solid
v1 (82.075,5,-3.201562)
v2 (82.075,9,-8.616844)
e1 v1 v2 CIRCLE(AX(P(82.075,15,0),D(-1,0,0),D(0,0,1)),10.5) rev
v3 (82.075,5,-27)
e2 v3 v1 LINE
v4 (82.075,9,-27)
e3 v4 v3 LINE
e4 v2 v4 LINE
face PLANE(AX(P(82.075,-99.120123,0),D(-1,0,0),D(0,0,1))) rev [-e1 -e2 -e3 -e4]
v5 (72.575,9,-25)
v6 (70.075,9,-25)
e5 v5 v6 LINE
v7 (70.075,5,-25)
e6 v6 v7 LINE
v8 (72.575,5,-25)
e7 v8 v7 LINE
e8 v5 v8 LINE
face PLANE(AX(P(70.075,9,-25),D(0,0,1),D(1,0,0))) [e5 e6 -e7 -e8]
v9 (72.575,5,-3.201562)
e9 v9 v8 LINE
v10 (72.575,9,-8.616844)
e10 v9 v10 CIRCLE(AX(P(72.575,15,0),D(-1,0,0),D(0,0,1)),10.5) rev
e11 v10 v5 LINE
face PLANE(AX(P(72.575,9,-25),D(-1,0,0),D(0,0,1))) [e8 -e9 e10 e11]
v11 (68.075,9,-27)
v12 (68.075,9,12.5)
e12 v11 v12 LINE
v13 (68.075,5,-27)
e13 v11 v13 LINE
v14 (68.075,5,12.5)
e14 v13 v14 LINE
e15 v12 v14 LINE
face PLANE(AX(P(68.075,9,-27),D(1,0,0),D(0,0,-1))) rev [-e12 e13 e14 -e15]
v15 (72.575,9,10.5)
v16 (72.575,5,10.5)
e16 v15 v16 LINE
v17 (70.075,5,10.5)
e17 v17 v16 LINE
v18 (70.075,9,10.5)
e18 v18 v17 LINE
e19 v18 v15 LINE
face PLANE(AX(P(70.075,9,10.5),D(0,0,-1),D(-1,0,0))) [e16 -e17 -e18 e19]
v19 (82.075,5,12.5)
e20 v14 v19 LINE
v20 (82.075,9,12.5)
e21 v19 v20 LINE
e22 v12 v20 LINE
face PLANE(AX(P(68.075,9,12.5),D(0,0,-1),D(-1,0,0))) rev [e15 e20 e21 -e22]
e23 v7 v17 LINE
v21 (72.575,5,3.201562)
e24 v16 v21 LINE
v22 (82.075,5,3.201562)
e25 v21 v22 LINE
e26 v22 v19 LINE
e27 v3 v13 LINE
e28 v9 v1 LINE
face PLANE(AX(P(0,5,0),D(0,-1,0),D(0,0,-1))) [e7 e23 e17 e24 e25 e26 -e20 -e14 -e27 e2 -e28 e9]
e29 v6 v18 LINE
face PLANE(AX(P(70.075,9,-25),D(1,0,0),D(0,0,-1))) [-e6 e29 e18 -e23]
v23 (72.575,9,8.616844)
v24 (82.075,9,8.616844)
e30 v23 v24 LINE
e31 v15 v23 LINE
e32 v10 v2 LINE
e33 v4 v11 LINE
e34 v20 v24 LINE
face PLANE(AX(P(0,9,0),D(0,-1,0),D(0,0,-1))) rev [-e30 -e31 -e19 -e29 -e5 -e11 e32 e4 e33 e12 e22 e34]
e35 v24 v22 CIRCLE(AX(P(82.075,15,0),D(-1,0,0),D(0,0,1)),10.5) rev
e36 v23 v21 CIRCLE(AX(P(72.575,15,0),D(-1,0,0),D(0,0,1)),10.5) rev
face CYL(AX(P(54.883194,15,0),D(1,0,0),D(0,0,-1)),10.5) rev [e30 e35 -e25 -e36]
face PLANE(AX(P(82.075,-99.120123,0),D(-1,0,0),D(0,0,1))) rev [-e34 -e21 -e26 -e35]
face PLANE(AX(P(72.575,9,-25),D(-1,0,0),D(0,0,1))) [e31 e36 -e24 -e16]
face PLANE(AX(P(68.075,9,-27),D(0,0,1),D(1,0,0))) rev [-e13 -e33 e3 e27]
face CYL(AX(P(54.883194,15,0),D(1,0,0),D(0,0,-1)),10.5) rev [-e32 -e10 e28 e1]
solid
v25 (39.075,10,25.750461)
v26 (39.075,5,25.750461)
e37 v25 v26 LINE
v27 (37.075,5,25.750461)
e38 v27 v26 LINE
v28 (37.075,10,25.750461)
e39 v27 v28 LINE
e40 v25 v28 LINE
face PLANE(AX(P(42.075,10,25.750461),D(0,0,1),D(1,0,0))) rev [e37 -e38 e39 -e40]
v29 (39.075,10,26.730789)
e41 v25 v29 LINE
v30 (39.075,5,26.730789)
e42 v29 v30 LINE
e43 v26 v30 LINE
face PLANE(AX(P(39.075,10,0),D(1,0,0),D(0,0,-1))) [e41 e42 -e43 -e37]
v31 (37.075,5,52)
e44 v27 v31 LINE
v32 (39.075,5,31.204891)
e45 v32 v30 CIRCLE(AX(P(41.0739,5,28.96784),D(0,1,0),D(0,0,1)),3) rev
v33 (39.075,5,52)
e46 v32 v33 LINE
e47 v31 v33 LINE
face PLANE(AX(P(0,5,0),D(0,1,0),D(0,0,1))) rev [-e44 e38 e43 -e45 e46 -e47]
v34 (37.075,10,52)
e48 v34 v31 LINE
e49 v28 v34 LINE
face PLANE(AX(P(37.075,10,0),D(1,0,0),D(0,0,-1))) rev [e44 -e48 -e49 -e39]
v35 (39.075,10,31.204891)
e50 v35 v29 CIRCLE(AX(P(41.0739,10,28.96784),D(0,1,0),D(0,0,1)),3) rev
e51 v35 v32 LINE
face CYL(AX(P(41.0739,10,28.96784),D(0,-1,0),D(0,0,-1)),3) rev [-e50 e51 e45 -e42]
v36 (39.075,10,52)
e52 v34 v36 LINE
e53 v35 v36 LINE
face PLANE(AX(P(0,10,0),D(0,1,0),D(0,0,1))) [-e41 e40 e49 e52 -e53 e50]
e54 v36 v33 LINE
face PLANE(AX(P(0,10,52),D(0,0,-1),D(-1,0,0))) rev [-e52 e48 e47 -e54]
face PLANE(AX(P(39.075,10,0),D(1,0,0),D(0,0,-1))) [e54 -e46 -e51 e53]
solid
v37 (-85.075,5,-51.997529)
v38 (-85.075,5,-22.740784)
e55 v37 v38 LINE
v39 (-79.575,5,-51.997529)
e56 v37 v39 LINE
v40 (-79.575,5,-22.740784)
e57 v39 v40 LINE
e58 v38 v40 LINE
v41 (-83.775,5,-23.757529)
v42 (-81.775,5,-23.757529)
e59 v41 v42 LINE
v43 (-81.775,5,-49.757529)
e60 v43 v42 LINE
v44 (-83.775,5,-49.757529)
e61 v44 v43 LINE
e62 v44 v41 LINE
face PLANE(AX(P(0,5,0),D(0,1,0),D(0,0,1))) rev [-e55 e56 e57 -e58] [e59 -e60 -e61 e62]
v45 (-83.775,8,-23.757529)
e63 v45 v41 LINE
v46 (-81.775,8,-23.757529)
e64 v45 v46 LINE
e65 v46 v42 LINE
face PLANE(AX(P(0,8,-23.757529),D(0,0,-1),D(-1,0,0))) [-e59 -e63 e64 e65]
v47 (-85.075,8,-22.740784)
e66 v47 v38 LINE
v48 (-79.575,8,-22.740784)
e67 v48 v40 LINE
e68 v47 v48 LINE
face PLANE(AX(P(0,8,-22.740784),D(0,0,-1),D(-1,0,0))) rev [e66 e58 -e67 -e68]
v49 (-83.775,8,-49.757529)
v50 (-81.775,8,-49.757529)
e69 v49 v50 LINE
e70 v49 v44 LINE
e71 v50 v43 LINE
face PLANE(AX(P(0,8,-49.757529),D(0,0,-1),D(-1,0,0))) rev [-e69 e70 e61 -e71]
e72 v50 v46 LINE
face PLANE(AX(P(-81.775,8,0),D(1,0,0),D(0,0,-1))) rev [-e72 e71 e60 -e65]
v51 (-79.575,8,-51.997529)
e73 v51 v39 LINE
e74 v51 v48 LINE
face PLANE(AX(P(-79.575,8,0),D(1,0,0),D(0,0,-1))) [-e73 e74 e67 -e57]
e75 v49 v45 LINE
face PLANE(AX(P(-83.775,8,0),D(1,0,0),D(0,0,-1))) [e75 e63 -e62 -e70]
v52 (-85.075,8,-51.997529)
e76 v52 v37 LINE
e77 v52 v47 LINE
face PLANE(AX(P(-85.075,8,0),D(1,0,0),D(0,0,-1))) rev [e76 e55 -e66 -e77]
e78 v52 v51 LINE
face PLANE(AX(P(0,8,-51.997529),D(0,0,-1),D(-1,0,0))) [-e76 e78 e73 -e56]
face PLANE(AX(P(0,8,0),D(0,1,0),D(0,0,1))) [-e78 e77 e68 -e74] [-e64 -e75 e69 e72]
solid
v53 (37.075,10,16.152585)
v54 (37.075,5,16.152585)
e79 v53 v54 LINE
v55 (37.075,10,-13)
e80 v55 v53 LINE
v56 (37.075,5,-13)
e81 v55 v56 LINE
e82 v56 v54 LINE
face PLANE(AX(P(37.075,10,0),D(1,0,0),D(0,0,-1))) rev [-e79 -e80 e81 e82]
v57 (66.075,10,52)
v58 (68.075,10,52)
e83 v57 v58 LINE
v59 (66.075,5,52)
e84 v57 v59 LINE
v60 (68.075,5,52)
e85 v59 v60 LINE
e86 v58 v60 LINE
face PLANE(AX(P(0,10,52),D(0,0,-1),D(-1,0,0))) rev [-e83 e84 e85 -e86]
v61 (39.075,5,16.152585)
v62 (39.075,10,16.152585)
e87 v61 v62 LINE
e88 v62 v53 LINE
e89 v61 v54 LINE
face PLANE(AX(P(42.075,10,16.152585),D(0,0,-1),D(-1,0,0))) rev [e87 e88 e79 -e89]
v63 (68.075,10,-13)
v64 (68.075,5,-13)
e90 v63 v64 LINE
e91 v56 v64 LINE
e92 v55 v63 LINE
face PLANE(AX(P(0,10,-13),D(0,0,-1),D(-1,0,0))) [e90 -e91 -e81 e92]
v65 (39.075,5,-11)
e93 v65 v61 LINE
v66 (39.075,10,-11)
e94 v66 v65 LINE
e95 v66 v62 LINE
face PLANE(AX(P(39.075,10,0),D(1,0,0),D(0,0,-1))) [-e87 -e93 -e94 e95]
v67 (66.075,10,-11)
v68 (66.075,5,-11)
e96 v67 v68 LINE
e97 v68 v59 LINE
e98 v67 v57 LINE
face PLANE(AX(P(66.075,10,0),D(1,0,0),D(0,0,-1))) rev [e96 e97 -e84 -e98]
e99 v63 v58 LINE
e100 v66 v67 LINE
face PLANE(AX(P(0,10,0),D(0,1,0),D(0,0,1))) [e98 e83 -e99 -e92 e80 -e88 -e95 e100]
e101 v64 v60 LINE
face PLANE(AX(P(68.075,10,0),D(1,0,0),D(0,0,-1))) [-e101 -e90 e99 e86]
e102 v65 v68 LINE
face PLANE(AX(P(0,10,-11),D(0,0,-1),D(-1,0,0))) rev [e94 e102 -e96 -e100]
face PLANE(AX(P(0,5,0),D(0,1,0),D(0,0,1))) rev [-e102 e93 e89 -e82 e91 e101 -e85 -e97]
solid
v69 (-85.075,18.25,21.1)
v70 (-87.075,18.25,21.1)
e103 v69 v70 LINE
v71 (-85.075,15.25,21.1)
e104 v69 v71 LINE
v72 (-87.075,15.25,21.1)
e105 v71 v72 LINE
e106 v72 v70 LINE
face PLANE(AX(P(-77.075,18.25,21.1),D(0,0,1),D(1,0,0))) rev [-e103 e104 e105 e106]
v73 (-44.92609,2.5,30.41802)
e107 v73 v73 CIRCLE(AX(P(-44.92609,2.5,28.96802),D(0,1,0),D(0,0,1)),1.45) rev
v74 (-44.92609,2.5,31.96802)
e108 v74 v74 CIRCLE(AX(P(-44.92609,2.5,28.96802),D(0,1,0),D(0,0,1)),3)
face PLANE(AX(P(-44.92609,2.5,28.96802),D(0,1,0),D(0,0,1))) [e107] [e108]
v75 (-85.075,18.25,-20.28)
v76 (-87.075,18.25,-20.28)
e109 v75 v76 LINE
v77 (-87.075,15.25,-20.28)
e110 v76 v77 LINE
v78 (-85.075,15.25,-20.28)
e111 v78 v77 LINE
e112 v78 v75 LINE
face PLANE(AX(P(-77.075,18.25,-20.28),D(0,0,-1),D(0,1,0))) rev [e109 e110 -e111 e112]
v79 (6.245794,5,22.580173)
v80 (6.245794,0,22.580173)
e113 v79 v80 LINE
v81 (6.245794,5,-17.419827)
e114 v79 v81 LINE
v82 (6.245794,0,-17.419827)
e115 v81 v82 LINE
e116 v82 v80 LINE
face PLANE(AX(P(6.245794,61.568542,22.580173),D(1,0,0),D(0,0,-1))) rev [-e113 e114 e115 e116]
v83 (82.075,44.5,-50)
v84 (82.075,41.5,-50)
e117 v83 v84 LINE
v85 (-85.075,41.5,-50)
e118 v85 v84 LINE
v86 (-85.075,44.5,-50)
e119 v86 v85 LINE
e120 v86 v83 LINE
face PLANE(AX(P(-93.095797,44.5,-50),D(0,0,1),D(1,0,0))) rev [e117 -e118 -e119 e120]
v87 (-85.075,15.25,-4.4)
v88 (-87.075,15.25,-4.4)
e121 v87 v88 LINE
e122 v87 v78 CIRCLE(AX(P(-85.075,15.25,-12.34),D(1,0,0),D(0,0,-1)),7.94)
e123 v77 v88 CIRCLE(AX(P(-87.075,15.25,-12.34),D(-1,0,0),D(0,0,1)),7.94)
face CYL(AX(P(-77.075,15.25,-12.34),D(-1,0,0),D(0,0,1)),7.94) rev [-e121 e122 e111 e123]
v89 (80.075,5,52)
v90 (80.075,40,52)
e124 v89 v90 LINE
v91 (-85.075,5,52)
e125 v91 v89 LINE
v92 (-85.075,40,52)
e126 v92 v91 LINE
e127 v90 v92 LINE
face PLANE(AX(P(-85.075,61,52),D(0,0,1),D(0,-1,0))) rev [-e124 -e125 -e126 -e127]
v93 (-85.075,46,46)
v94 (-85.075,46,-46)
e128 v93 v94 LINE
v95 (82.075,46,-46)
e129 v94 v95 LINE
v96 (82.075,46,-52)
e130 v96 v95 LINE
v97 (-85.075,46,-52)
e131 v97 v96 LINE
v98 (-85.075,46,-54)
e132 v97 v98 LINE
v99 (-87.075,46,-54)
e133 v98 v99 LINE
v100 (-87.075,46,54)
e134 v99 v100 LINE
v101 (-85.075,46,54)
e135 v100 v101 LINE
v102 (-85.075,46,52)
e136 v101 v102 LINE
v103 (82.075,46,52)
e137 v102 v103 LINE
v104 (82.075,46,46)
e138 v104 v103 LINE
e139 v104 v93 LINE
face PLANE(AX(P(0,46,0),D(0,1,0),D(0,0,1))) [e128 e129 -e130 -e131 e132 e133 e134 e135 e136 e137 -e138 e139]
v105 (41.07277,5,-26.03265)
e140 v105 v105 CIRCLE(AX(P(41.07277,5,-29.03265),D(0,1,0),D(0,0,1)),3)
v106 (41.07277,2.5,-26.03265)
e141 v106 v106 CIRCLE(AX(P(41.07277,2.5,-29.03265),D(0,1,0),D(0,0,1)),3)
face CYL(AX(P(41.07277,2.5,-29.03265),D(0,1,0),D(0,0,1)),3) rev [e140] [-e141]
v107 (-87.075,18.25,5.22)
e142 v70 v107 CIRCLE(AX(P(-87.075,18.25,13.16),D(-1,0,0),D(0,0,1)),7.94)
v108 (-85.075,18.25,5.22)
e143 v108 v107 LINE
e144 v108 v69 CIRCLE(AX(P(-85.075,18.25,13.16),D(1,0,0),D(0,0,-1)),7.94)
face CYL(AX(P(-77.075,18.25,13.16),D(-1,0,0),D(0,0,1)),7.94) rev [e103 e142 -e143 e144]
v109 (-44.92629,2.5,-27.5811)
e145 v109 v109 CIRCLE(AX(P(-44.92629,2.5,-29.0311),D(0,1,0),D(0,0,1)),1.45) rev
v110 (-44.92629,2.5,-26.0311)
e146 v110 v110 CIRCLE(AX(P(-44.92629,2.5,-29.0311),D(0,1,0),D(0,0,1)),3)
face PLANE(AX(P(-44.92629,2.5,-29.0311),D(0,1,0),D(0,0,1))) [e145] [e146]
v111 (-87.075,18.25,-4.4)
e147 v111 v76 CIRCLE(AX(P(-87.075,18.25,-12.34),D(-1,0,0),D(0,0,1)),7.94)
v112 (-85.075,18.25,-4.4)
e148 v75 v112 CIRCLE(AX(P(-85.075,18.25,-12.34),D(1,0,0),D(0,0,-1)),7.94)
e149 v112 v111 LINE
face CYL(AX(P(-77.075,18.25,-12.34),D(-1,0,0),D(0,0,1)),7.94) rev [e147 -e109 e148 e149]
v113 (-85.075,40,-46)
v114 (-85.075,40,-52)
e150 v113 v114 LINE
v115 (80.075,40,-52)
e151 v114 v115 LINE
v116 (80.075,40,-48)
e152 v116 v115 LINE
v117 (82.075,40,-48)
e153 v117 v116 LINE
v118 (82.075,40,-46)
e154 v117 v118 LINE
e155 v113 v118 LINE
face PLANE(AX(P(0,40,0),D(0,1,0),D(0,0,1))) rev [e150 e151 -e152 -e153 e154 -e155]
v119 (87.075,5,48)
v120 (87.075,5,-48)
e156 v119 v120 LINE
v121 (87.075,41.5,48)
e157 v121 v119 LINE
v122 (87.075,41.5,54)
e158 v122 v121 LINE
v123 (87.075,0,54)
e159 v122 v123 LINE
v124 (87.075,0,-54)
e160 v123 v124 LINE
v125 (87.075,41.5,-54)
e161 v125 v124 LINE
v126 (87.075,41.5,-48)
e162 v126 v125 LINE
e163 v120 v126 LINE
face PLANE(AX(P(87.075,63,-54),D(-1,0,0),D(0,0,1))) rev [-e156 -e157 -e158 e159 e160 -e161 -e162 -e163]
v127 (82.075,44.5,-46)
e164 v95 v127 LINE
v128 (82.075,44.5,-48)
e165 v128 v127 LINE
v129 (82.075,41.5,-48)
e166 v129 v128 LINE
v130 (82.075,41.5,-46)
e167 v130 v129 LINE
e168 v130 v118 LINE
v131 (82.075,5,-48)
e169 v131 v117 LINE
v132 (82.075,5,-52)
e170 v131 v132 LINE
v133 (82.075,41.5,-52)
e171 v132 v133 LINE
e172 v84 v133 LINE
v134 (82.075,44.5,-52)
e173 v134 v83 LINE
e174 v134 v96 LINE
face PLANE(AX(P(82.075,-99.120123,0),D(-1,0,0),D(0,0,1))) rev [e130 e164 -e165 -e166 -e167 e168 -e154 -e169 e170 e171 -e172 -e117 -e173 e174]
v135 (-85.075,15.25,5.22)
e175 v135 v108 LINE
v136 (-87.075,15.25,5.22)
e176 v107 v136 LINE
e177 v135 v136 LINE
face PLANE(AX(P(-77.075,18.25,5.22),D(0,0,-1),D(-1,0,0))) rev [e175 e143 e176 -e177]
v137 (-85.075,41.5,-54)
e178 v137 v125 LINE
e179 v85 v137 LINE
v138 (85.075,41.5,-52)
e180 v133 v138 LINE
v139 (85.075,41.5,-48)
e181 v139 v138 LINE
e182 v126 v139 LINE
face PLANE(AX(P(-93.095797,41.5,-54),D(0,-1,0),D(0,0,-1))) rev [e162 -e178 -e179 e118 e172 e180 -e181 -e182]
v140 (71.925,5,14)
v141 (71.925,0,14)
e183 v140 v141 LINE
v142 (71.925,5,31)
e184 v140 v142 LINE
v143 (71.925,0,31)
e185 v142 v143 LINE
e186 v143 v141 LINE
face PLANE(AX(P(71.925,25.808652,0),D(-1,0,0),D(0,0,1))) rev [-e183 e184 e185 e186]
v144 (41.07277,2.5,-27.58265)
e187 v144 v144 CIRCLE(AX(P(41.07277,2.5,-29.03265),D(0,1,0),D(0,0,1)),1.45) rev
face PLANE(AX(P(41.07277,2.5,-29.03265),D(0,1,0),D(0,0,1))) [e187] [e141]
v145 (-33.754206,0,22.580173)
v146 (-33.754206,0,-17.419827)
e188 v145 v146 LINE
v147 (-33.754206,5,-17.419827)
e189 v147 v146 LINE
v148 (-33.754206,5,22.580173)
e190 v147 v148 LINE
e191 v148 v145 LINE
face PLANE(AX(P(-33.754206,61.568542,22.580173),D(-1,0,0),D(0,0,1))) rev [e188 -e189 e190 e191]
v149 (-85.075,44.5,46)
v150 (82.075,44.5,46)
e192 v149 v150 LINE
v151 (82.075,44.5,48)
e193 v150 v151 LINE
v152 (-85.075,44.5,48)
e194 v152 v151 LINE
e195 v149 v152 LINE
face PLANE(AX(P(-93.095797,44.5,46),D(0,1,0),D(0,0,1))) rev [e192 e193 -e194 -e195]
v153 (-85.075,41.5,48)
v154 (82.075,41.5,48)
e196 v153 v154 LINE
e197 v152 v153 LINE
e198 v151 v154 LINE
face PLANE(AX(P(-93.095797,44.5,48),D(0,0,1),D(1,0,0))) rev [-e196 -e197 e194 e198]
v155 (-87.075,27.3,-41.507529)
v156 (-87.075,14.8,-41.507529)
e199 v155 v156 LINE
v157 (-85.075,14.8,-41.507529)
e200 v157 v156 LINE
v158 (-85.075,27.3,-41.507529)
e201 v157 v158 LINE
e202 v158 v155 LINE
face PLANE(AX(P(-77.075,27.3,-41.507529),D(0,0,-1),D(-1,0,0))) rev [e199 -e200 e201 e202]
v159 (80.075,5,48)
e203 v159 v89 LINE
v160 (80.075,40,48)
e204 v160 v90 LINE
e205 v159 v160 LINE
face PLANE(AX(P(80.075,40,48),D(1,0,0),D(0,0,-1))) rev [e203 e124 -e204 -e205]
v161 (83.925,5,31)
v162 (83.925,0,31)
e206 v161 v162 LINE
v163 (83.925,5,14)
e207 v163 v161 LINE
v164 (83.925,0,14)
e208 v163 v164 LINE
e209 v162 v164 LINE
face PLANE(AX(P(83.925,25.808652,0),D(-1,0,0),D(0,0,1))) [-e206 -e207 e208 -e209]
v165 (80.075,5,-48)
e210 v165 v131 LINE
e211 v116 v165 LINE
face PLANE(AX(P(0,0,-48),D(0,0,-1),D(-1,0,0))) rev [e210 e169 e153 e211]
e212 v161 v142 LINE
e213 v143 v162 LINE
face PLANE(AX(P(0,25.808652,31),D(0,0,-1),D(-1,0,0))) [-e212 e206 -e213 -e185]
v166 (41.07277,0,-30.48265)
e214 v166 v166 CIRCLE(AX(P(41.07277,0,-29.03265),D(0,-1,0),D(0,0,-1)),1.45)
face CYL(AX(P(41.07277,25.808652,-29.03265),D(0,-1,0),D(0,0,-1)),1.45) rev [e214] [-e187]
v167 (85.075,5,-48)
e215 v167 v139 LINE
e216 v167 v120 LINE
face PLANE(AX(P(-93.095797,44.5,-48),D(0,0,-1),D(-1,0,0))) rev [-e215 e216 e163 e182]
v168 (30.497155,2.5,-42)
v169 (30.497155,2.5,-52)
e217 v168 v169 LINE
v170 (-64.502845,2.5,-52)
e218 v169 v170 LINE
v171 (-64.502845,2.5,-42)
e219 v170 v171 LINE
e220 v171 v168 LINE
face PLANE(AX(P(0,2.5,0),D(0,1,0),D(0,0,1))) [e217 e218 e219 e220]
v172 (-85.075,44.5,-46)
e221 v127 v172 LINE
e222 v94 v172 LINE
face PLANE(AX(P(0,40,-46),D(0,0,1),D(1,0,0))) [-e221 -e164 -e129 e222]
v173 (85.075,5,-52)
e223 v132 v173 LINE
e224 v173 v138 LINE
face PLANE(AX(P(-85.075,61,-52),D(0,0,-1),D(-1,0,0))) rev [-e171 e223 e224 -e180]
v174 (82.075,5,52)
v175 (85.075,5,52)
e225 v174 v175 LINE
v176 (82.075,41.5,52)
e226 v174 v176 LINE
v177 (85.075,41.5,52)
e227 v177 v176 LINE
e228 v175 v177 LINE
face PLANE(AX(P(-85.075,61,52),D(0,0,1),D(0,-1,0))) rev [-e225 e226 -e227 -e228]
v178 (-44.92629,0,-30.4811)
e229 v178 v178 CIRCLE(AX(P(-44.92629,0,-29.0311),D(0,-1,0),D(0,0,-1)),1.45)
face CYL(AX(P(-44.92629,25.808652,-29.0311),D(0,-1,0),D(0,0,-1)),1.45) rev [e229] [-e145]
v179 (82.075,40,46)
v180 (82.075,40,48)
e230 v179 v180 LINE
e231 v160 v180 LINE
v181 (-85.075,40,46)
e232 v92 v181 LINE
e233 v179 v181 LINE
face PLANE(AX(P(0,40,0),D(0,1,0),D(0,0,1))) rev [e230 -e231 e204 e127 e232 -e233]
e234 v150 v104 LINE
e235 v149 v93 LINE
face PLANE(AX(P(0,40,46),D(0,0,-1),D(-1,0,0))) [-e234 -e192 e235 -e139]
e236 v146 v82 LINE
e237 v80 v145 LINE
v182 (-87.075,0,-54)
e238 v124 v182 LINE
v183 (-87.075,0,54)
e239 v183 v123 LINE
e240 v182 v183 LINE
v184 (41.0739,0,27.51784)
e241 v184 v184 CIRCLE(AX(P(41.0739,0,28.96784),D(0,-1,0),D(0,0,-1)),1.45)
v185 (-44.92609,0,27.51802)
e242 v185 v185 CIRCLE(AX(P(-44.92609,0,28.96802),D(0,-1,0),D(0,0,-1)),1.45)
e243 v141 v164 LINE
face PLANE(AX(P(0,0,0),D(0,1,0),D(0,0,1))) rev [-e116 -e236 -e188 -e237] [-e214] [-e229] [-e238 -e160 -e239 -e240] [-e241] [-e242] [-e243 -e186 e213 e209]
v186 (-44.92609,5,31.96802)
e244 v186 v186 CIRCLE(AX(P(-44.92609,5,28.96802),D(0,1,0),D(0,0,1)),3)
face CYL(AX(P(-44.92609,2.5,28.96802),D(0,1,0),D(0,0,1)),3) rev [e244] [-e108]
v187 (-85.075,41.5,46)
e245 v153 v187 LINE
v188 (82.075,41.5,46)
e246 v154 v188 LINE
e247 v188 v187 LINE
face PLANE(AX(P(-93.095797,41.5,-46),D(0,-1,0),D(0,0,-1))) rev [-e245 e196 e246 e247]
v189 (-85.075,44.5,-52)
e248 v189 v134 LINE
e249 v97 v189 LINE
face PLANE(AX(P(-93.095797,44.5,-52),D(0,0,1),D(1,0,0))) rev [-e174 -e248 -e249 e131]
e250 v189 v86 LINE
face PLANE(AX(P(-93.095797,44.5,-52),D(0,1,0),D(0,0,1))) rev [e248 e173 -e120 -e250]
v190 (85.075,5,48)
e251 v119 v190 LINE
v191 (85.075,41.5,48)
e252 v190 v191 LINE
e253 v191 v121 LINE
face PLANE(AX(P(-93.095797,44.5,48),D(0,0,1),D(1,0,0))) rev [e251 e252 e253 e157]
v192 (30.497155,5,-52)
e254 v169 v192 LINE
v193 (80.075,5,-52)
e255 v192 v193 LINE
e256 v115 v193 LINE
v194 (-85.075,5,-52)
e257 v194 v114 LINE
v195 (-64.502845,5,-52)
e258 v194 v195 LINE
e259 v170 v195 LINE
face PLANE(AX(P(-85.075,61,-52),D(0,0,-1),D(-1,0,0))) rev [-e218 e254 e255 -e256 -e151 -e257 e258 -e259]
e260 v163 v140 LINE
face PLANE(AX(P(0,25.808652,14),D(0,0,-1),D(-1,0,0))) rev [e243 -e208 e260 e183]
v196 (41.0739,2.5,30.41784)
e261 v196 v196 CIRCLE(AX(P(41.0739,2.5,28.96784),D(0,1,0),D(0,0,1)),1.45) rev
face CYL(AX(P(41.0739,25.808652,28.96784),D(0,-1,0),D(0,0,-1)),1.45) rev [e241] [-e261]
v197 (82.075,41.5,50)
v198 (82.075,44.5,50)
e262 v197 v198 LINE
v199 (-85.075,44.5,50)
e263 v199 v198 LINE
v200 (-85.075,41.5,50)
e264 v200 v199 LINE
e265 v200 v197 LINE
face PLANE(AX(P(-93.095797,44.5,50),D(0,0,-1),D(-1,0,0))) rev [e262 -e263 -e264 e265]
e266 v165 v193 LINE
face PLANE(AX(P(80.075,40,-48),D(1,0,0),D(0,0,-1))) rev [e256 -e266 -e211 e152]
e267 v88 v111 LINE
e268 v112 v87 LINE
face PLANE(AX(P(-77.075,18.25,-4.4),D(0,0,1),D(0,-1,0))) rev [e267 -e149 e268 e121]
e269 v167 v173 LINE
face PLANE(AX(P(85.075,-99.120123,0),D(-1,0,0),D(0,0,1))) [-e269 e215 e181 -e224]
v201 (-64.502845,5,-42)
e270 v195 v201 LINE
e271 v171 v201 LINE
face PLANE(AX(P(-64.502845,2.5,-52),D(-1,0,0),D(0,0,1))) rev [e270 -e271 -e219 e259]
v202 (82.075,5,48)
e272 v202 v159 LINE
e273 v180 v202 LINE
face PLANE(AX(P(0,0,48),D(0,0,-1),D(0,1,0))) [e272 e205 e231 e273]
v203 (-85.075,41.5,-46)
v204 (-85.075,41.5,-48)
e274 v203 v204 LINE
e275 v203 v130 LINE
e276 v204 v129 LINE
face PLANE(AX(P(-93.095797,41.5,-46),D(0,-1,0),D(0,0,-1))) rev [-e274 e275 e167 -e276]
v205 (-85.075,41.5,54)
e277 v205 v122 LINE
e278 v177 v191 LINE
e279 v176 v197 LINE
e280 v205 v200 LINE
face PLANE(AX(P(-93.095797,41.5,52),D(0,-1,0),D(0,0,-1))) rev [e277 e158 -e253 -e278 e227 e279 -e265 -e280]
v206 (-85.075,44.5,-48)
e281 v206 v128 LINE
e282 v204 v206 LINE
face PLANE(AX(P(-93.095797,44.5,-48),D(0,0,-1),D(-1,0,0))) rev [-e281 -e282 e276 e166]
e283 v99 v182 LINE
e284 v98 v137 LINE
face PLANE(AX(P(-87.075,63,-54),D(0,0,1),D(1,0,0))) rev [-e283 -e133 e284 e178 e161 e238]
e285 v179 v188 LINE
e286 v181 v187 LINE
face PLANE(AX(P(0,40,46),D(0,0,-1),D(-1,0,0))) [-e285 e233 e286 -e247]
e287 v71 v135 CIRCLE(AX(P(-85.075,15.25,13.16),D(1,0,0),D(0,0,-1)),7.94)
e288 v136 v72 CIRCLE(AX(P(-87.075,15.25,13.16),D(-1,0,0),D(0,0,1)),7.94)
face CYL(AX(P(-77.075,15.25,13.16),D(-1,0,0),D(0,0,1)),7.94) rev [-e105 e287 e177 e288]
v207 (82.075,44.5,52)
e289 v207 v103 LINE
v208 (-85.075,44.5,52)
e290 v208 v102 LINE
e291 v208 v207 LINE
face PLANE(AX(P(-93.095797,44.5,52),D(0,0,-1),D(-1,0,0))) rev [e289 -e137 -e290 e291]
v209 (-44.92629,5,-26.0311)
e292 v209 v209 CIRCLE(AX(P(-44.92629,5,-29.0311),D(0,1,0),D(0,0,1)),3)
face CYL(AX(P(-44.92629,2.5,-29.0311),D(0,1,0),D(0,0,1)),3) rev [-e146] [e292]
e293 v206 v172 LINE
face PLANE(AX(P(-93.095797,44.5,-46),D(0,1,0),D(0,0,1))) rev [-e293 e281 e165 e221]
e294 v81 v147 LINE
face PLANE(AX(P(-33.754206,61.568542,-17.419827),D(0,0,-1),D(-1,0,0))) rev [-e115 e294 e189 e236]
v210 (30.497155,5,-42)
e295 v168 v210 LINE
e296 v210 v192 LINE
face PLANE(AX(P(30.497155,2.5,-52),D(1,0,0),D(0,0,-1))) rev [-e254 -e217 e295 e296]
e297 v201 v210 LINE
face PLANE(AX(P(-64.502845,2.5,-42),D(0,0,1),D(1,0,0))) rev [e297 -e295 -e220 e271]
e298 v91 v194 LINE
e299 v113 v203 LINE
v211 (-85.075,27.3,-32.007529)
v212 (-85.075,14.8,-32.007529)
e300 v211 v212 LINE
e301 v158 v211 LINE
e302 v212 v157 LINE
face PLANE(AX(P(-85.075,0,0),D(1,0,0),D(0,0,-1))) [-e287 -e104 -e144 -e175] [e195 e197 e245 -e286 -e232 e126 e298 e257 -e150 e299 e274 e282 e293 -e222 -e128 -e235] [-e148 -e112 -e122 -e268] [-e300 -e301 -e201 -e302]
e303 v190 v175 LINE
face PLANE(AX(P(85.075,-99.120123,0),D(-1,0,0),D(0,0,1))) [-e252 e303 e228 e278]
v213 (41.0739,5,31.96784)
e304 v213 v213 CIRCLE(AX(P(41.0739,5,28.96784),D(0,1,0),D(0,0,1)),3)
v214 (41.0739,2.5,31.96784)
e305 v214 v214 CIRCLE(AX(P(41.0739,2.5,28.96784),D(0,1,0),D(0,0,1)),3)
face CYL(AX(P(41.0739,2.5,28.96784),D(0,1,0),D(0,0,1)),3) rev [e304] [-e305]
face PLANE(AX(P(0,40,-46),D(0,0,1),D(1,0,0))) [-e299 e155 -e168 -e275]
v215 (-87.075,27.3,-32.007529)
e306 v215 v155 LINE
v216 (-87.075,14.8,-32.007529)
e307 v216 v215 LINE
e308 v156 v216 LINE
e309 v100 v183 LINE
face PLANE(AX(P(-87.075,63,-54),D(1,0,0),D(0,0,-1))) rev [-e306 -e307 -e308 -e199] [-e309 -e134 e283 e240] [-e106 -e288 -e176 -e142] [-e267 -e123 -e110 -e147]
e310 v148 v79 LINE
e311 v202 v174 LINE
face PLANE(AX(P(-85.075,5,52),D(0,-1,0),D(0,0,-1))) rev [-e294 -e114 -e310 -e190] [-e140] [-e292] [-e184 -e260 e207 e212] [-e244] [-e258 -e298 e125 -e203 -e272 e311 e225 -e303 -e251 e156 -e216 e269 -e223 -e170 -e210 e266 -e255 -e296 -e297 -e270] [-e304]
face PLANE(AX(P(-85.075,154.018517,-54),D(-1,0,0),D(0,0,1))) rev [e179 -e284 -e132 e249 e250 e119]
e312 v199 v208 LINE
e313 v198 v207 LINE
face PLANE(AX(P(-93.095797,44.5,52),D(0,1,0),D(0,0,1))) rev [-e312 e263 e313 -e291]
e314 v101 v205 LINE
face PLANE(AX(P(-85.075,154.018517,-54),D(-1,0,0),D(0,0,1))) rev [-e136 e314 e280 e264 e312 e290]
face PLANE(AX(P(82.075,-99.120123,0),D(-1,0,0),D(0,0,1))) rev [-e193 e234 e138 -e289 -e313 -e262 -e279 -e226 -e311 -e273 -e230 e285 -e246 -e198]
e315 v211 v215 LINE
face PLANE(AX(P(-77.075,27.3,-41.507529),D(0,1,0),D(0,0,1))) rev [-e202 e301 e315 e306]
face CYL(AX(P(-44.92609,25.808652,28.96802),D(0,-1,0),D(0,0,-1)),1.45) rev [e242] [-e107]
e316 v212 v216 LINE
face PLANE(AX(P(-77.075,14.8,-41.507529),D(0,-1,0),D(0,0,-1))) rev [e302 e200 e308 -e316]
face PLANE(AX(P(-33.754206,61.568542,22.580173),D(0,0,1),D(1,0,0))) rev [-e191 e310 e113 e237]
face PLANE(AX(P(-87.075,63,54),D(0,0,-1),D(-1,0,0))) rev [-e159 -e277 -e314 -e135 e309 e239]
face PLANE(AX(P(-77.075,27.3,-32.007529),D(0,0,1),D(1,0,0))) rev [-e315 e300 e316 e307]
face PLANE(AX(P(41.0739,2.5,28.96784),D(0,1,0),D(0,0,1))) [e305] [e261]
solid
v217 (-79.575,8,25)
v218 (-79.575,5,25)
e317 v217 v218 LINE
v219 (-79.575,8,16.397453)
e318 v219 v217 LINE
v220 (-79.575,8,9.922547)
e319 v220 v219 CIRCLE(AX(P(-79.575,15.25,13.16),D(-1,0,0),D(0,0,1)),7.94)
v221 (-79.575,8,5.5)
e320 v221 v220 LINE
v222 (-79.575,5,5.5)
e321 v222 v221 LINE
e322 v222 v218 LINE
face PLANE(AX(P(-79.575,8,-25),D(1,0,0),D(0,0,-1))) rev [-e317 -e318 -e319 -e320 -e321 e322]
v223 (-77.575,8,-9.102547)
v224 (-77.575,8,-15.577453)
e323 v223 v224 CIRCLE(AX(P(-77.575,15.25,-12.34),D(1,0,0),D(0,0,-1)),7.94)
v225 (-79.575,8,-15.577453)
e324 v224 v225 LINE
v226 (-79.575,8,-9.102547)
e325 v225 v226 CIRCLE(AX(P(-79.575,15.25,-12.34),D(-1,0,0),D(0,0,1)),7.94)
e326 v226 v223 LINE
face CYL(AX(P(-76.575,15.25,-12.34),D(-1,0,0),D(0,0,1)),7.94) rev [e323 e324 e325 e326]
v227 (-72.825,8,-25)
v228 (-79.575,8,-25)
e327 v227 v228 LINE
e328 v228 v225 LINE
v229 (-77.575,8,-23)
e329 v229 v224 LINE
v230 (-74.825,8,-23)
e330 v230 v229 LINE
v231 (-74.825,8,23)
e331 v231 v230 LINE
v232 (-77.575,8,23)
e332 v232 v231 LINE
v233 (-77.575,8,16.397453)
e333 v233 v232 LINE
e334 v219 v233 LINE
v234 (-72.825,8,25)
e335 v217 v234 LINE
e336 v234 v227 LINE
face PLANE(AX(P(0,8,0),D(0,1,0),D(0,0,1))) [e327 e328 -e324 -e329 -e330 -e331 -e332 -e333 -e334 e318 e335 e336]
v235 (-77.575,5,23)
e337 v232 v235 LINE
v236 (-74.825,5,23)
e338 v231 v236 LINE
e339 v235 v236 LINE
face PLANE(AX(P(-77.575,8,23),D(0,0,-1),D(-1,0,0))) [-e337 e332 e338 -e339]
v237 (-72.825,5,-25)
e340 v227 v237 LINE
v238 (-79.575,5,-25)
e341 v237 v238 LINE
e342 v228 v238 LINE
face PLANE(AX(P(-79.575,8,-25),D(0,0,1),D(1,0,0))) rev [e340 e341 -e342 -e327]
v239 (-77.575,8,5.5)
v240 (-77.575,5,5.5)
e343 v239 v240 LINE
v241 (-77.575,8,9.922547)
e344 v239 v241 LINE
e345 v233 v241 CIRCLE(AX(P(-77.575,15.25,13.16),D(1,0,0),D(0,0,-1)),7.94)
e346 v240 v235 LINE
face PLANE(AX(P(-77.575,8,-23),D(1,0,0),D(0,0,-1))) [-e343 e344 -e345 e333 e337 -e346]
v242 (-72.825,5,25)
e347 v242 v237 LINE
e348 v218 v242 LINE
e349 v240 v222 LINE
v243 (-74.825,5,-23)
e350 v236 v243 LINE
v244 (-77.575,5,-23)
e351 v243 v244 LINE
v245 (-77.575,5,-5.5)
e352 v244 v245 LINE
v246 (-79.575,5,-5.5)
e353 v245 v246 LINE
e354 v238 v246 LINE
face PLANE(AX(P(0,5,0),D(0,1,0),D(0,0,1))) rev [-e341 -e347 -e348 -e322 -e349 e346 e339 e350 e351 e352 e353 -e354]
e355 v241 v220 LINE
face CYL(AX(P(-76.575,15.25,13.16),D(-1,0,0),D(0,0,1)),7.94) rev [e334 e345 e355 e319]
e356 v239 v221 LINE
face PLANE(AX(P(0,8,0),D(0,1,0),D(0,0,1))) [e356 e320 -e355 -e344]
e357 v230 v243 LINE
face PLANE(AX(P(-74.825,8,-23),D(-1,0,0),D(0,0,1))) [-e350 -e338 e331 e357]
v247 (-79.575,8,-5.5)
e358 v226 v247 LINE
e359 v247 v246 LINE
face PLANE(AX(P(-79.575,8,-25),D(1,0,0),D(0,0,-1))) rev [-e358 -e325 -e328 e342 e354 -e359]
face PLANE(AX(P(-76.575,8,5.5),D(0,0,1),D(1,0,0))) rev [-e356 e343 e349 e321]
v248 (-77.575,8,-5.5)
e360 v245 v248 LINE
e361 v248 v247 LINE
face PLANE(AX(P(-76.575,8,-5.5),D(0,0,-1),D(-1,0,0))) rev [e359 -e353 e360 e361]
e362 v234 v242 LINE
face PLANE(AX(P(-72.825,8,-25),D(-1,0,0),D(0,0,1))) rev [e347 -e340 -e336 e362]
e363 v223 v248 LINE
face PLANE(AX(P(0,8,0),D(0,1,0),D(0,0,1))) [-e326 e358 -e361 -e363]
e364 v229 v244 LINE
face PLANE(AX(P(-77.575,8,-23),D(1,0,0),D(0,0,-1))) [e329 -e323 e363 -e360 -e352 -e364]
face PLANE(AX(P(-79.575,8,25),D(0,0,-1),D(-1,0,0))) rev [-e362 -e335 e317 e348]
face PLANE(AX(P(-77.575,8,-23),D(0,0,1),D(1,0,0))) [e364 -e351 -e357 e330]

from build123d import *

# Parameters (mm, degrees)
SKETCH_1_W           = 174.15
SKETCH_1_H           = 108
EXTRUDE_1_DEPTH      = 63
SKETCH_2_W           = 104
SKETCH_2_H           = 56
CUT_EXTRUDE_1_DEPTH  = 172.15
SKETCH_3_W           = 174.15
SKETCH_3_H           = 108
CUT_EXTRUDE_2_DEPTH  = 2
CUT_EXTRUDE_3_DEPTH  = 10
SKETCH_4_W           = 6.75
SKETCH_4_H           = 50
SKETCH_4_W_2         = 2.75
SKETCH_4_H_2         = 46
EXTRUDE_2_DEPTH      = 3
SKETCH_6_R           = 7.94
CUT_EXTRUDE_4_DEPTH  = 3
SKETCH_7_W           = 11
SKETCH_7_H           = 3
CUT_EXTRUDE_5_DEPTH  = 3
SKETCH_13_W          = 6.5
SKETCH_13_H          = 39.5
SKETCH_13_W_2        = 2.5
SKETCH_13_H_2        = 35.5
EXTRUDE_5_DEPTH      = 4
SKETCH_14_W          = 39.5
SKETCH_14_H          = 4
EXTRUDE_6_DEPTH      = 12.5
CUT_EXTRUDE_9_DEPTH  = 14.5
SKETCH_16_R          = 1.45
SKETCH_16_W          = 12
SKETCH_16_H          = 17
CUT_EXTRUDE_10_DEPTH = 5
SKETCH_17_R          = 3
CUT_EXTRUDE_11_DEPTH = 2.5
EXTRUDE_7_DEPTH      = 5
SKETCH_20_W          = 9.597876209
SKETCH_20_H          = 5
CUT_EXTRUDE_13_DEPTH = 5
SKETCH_22_W          = 174.15
SKETCH_22_H          = 108
CUT_EXTRUDE_14_DEPTH = 15
SKETCH_29_W          = 40
SKETCH_29_H          = 40
CUT_EXTRUDE_21_DEPTH = 5
SKETCH_30_W          = 95
SKETCH_30_H          = 10
CUT_EXTRUDE_22_DEPTH = 2.5
SKETCH_36_W          = 172.15
SKETCH_36_H          = 6
EXTRUDE_12_DEPTH     = 6
CUT_EXTRUDE_START    = -174.15
CUT_EXTRUDE_27_DEPTH = 174.15
SKETCH_38_W          = 88
SKETCH_38_H          = 4.5
CUT_EXTRUDE_28_DEPTH = 10
SKETCH_41_W          = 2
SKETCH_41_H          = 108
EXTRUDE_15_DEPTH     = 4.5
CUT_EXTRUDE_START_2  = -41
CUT_EXTRUDE_29_DEPTH = 41
SKETCH_43_W          = 2
SKETCH_43_H          = 35
EXTRUDE_17_DEPTH     = 4
SKETCH_44_W          = 2
SKETCH_44_H          = 35
EXTRUDE_18_DEPTH     = 4
SKETCH_48_W          = 9.5
SKETCH_48_H          = 12.5
CUT_EXTRUDE_30_DEPTH = 10
SKETCH_49_W          = 5.5
SKETCH_49_H          = 29.256745024
SKETCH_49_W_2        = 2
SKETCH_49_H_2        = 26
EXTRUDE_19_DEPTH     = 3
SKETCH_51_W          = 2
SKETCH_51_H          = 104
CUT_EXTRUDE_31_DEPTH = 4.5
SKETCH_52_W          = 2
SKETCH_52_H          = 35
EXTRUDE_20_DEPTH     = 4
SKETCH_53_W          = 2
SKETCH_53_H          = 35
EXTRUDE_21_DEPTH     = 4


# Read off the part's stored shape, not the designer's step: 컷-돌출29
with BuildPart() as part:
    # 스케치1 → 보스-돌출1 (new body)
    with BuildSketch(Plane(origin=(0, 0, 0), x_dir=(1, 0, 0), z_dir=(0, 1, 0))):
        Rectangle(SKETCH_1_W, SKETCH_1_H)
    extrude(amount=EXTRUDE_1_DEPTH)

    # 스케치2 → 컷-돌출1 (cut)
    with BuildSketch(Plane(origin=(87.075, 0, 0), x_dir=(0, 0, -1), z_dir=(1, 0, 0))):
        with Locations((0, 33)):
            Rectangle(SKETCH_2_W, SKETCH_2_H)
    extrude(amount=-CUT_EXTRUDE_1_DEPTH, mode=Mode.SUBTRACT)

    # 스케치3 → 컷-돌출2 (cut)
    with BuildSketch(Plane(origin=(0, 63, 0), x_dir=(1, 0, 0), z_dir=(0, 1, 0))):
        Rectangle(SKETCH_3_W, SKETCH_3_H)
    extrude(amount=-CUT_EXTRUDE_2_DEPTH, mode=Mode.SUBTRACT)

    # 스케치5 → 컷-돌출3 (cut)
    with BuildSketch(Plane.ZY.offset(87.075)):
        with BuildLine():
            Line((-20.28, 18.25), (-20.28, 15.25))
            ThreePointArc((-20.28, 15.25), (-12.34, 7.31), (-4.4, 15.25))
            Line((-4.4, 15.25), (-4.4, 18.25))
            ThreePointArc((-4.4, 18.25), (-12.34, 26.19), (-20.28, 18.25))
        make_face()
        with BuildLine():
            Line((5.22, 18.25), (5.22, 15.25))
            ThreePointArc((5.22, 15.25), (13.16, 7.31), (21.1, 15.25))
            Line((21.1, 15.25), (21.1, 18.25))
            ThreePointArc((21.1, 18.25), (13.16, 26.19), (5.22, 18.25))
        make_face()
    extrude(amount=-CUT_EXTRUDE_3_DEPTH, mode=Mode.SUBTRACT)

    # 스케치16 → 컷-돌출10 (cut)
    with BuildSketch(Plane(origin=(0, 0, 0), x_dir=(-1, 0, 0), z_dir=(0, -1, 0))):
        with Locations(Location((44.92609, -28.96802, 0), (0, 0, 90))):
            Circle(SKETCH_16_R)
        with Locations(Location((44.92629, 29.0311, 0), (0, 0, 90))):
            Circle(SKETCH_16_R)
        with Locations(Location((-41.07277, 29.03265, 0), (0, 0, 90))):
            Circle(SKETCH_16_R)
        with Locations(Location((-41.0739, -28.96784, 0), (0, 0, 90))):
            Circle(SKETCH_16_R)
        with Locations((-77.925, -22.5)):
            Rectangle(SKETCH_16_W, SKETCH_16_H)
    extrude(amount=-CUT_EXTRUDE_10_DEPTH, mode=Mode.SUBTRACT)

    # 스케치17 → 컷-돌출11 (cut)
    with BuildSketch(Plane(origin=(0, 5, 0), x_dir=(1, 0, 0), z_dir=(0, 1, 0))):
        with Locations(Location((-44.92629, 29.0311, 0), (0, 0, 270))):
            Circle(SKETCH_17_R)
        with Locations(Location((-44.92609, -28.96802, 0), (0, 0, 270))):
            Circle(SKETCH_17_R)
        with Locations(Location((41.07277, 29.03265, 0), (0, 0, 270))):
            Circle(SKETCH_17_R)
        with Locations(Location((41.0739, -28.96784, 0), (0, 0, 270))):
            Circle(SKETCH_17_R)
    extrude(amount=-CUT_EXTRUDE_11_DEPTH, mode=Mode.SUBTRACT)

    # 스케치22 → 컷-돌출14 (cut)
    with BuildSketch(Plane(origin=(0, 46, 0), x_dir=(1, 0, 0), z_dir=(0, 1, 0))):
        Rectangle(SKETCH_22_W, SKETCH_22_H)
    extrude(amount=CUT_EXTRUDE_14_DEPTH, mode=Mode.SUBTRACT)

    # 스케치29 → 컷-돌출21 (cut)
    with BuildSketch(Plane(origin=(0, 0, 0), x_dir=(-1, 0, 0), z_dir=(0, -1, 0))):
        with Locations((13.754205887, -2.580173459)):
            Rectangle(SKETCH_29_W, SKETCH_29_H)
    extrude(amount=-CUT_EXTRUDE_21_DEPTH, mode=Mode.SUBTRACT)

    # 스케치30 → 컷-돌출22 (cut)
    with BuildSketch(Plane(origin=(0, 5, 0), x_dir=(1, 0, 0), z_dir=(0, 1, 0))):
        with Locations((-17.002844683, 47)):
            Rectangle(SKETCH_30_W, SKETCH_30_H)
    extrude(amount=-CUT_EXTRUDE_22_DEPTH, mode=Mode.SUBTRACT)

    # 스케치36 → 보스-돌출12 (add)
    with BuildSketch(Plane(origin=(0, 46, 0), x_dir=(1, 0, 0), z_dir=(0, 1, 0))):
        with Locations((1, 49)):
            Rectangle(SKETCH_36_W, SKETCH_36_H)
        with Locations((1, -49)):
            Rectangle(SKETCH_36_W, SKETCH_36_H)
    extrude(amount=-EXTRUDE_12_DEPTH)

    # 스케치37 → 컷-돌출27 (cut)
    with BuildSketch(Plane(origin=(87.075, 0, 0), x_dir=(0, 0, -1), z_dir=(1, 0, 0)).offset(CUT_EXTRUDE_START)):
        Polygon((-46, 44.5), (-48, 44.5), (-48, 41.5), (-46, 41.5), (-44, 41.5), (-44, 46), (-46, 46), align=None)
        Polygon((-50, 44.5), (-50, 41.5), (-52, 41.5), (-54, 41.5), (-54, 46), (-52, 46), (-52, 44.5), align=None)
        Polygon((46, 44.5), (46, 46), (44, 46), (44, 41.5), (46, 41.5), (48, 41.5), (48, 44.5), align=None)
        Polygon((54, 41.5), (52, 41.5), (50, 41.5), (50, 44.5), (52, 44.5), (52, 46), (54, 46), align=None)
    extrude(amount=CUT_EXTRUDE_27_DEPTH, mode=Mode.SUBTRACT)

    # 스케치38 → 컷-돌출28 (cut)
    with BuildSketch(Plane.ZY.offset(87.075)):
        with Locations((0, 43.75)):
            Rectangle(SKETCH_38_W, SKETCH_38_H)
    extrude(amount=-CUT_EXTRUDE_28_DEPTH, mode=Mode.SUBTRACT)

    # 스케치41 → 보스-돌출15 (add)
    with BuildSketch(Plane(origin=(0, 41.5, 0), x_dir=(1, 0, 0), z_dir=(0, 1, 0))):
        with Locations((-86.075, 0)):
            Rectangle(SKETCH_41_W, SKETCH_41_H)
    extrude(amount=EXTRUDE_15_DEPTH)


with BuildPart() as body_2:
    # 스케치4 → 보스-돌출2 (new body)
    with BuildSketch(Plane(origin=(0, 5, 0), x_dir=(1, 0, 0), z_dir=(0, 1, 0))):
        with Locations((-76.2, 0)):
            Rectangle(SKETCH_4_W, SKETCH_4_H)
        with Locations((-76.2, 0)):
            Rectangle(SKETCH_4_W_2, SKETCH_4_H_2, mode=Mode.SUBTRACT)
    extrude(amount=EXTRUDE_2_DEPTH)

    # 스케치6 → 컷-돌출4 (cut)
    with BuildSketch(Plane.ZY.offset(79.575)):
        with Locations((-12.34, 15.25)):
            Circle(SKETCH_6_R)
        with Locations((13.16, 15.25)):
            Circle(SKETCH_6_R)
    extrude(amount=-CUT_EXTRUDE_4_DEPTH, mode=Mode.SUBTRACT)

    # 스케치7 → 컷-돌출5 (cut)
    with BuildSketch(Plane.ZY.offset(79.575)):
        with Locations((0, 6.5)):
            Rectangle(SKETCH_7_W, SKETCH_7_H)
    extrude(amount=-CUT_EXTRUDE_5_DEPTH, mode=Mode.SUBTRACT)


with BuildPart() as body_3:
    # 스케치13 → 보스-돌출5 (new body)
    with BuildSketch(Plane(origin=(0, 5, 0), x_dir=(1, 0, 0), z_dir=(0, 1, 0))):
        with Locations((71.325, 7.25)):
            Rectangle(SKETCH_13_W, SKETCH_13_H)
        with Locations((71.325, 7.25)):
            Rectangle(SKETCH_13_W_2, SKETCH_13_H_2, mode=Mode.SUBTRACT)
    extrude(amount=EXTRUDE_5_DEPTH)

    # 스케치14 → 보스-돌출6 (add)
    with BuildSketch(Plane(origin=(74.575, 0, 0), x_dir=(0, 0, -1), z_dir=(1, 0, 0))):
        with Locations((7.25, 7)):
            Rectangle(SKETCH_14_W, SKETCH_14_H)
    extrude(amount=EXTRUDE_6_DEPTH)

    # 스케치15 → 컷-돌출9 (cut)
    with BuildSketch(Plane(origin=(87.075, 0, 0), x_dir=(0, 0, -1), z_dir=(1, 0, 0))):
        with BuildLine():
            Line((8.61684397, 9), (-8.61684397, 9))
            ThreePointArc((-8.61684397, 9), (-6.23848384, 6.554212921), (-3.201562119, 5))
            Line((-3.201562119, 5), (3.201562119, 5))
            ThreePointArc((3.201562119, 5), (6.23848384, 6.554212921), (8.61684397, 9))
        make_face()
    extrude(amount=-CUT_EXTRUDE_9_DEPTH, mode=Mode.SUBTRACT)


with BuildPart() as body_4:
    # 스케치19 → 보스-돌출7 (new body)
    with BuildSketch(Plane(origin=(0, 5, 0), x_dir=(1, 0, 0), z_dir=(0, 1, 0))):
        with BuildLine():
            ThreePointArc((39.075, -31.204891361), (38.0739, -28.96784), (39.075, -26.730788639))
            Line((39.075, -26.730788639), (39.075, 11))
            Line((39.075, 11), (66.075, 11))
            Line((66.075, 11), (66.075, -52))
            Line((66.075, -52), (68.075, -52))
            Line((68.075, -52), (68.075, 13))
            Line((68.075, 13), (37.075, 13))
            Line((37.075, 13), (37.075, -52))
            Line((37.075, -52), (39.075, -52))
            Line((39.075, -52), (39.075, -31.204891361))
        make_face()
    extrude(amount=EXTRUDE_7_DEPTH)

    # 스케치20 → 컷-돌출13 (cut)
    with BuildSketch(Plane.ZY.offset(-37.075)):
        with Locations((20.951522743, 7.5)):
            Rectangle(SKETCH_20_W, SKETCH_20_H)
    extrude(amount=-CUT_EXTRUDE_13_DEPTH, mode=Mode.SUBTRACT)


with BuildPart() as cut_extrude_13_piece_1:
    # of the separate pieces the step leaves, piece 1, a body of its own (cut_extrude_13_pieces)
    add(body_4.part.solids().sort_by_distance((39.075, 5, 16.152584639))[0])


with BuildPart() as cut_extrude_13_piece_2:
    # of the separate pieces the step leaves, piece 2, a body of its own (cut_extrude_13_pieces)
    add(body_4.part.solids().sort_by_distance((39.075, 5, 31.204891361))[0])


with BuildPart() as cut_extrude_29_tool:
    # 컷-돌출29 outline → 컷-돌출29 (new body)
    with BuildSketch(Plane(origin=(0, 46, 0), x_dir=(1, 0, 0), z_dir=(0, 1, 0)).offset(CUT_EXTRUDE_START_2)):
        Polygon((85.075, 52), (82.075, 52), (82.075, -52), (85.075, -52), (85.075, -48), (87.075, -48), (87.075, 48), (85.075, 48), align=None)
    extrude(amount=CUT_EXTRUDE_29_DEPTH)


with BuildPart() as part_1:
    add(part.part)

    # 컷-돌출29: cut by cut_extrude_29_tool
    add(cut_extrude_29_tool.part, mode=Mode.SUBTRACT)

    # 스케치43 → 보스-돌출17 (add)
    with BuildSketch(Plane.XY.offset(-52)):
        with Locations((86.075, 22.5)):
            Rectangle(SKETCH_43_W, SKETCH_43_H)
    extrude(amount=EXTRUDE_17_DEPTH)

    # 스케치44 → 보스-돌출18 (add)
    with BuildSketch(Plane(origin=(0, 0, 52), x_dir=(-1, 0, 0), z_dir=(0, 0, -1))):
        with Locations((-86.075, 22.5)):
            Rectangle(SKETCH_44_W, SKETCH_44_H)
    extrude(amount=EXTRUDE_18_DEPTH)

    # 스케치48 → 컷-돌출30 (cut)
    with BuildSketch(Plane.ZY.offset(87.075)):
        with Locations((-36.757528825, 21.05)):
            Rectangle(SKETCH_48_W, SKETCH_48_H)
    extrude(amount=-CUT_EXTRUDE_30_DEPTH, mode=Mode.SUBTRACT)

    # 스케치51 → 컷-돌출31 (cut)
    with BuildSketch(Plane(origin=(0, 46, 0), x_dir=(1, 0, 0), z_dir=(0, 1, 0))):
        with Locations((86.075, 0)):
            Rectangle(SKETCH_51_W, SKETCH_51_H)
    extrude(amount=-CUT_EXTRUDE_31_DEPTH, mode=Mode.SUBTRACT)

    # 스케치52 → 보스-돌출20 (add)
    with BuildSketch(Plane.XY.offset(-52)):
        with Locations((81.075, 22.5)):
            Rectangle(SKETCH_52_W, SKETCH_52_H)
    extrude(amount=EXTRUDE_20_DEPTH)

    # 스케치53 → 보스-돌출21 (add)
    with BuildSketch(Plane(origin=(0, 0, 52), x_dir=(-1, 0, 0), z_dir=(0, 0, -1))):
        with Locations((-81.075, 22.5)):
            Rectangle(SKETCH_53_W, SKETCH_53_H)
    extrude(amount=EXTRUDE_21_DEPTH)


with BuildPart() as body_3_1:
    add(body_3.part)

    # 컷-돌출29: cut by cut_extrude_29_tool
    add(cut_extrude_29_tool.part, mode=Mode.SUBTRACT)


with BuildPart() as body_6:
    # 스케치49 → 보스-돌출19 (new body)
    with BuildSketch(Plane(origin=(0, 5, 0), x_dir=(1, 0, 0), z_dir=(0, 1, 0))):
        with Locations((-82.325, 37.369156313)):
            Rectangle(SKETCH_49_W, SKETCH_49_H)
        with Locations((-82.775, 36.757528825)):
            Rectangle(SKETCH_49_W_2, SKETCH_49_H_2, mode=Mode.SUBTRACT)
    extrude(amount=EXTRUDE_19_DEPTH)


solid = Compound([body_2.part, cut_extrude_13_piece_1.part, cut_extrude_13_piece_2.part, part_1.part, body_3_1.part, body_6.part])
